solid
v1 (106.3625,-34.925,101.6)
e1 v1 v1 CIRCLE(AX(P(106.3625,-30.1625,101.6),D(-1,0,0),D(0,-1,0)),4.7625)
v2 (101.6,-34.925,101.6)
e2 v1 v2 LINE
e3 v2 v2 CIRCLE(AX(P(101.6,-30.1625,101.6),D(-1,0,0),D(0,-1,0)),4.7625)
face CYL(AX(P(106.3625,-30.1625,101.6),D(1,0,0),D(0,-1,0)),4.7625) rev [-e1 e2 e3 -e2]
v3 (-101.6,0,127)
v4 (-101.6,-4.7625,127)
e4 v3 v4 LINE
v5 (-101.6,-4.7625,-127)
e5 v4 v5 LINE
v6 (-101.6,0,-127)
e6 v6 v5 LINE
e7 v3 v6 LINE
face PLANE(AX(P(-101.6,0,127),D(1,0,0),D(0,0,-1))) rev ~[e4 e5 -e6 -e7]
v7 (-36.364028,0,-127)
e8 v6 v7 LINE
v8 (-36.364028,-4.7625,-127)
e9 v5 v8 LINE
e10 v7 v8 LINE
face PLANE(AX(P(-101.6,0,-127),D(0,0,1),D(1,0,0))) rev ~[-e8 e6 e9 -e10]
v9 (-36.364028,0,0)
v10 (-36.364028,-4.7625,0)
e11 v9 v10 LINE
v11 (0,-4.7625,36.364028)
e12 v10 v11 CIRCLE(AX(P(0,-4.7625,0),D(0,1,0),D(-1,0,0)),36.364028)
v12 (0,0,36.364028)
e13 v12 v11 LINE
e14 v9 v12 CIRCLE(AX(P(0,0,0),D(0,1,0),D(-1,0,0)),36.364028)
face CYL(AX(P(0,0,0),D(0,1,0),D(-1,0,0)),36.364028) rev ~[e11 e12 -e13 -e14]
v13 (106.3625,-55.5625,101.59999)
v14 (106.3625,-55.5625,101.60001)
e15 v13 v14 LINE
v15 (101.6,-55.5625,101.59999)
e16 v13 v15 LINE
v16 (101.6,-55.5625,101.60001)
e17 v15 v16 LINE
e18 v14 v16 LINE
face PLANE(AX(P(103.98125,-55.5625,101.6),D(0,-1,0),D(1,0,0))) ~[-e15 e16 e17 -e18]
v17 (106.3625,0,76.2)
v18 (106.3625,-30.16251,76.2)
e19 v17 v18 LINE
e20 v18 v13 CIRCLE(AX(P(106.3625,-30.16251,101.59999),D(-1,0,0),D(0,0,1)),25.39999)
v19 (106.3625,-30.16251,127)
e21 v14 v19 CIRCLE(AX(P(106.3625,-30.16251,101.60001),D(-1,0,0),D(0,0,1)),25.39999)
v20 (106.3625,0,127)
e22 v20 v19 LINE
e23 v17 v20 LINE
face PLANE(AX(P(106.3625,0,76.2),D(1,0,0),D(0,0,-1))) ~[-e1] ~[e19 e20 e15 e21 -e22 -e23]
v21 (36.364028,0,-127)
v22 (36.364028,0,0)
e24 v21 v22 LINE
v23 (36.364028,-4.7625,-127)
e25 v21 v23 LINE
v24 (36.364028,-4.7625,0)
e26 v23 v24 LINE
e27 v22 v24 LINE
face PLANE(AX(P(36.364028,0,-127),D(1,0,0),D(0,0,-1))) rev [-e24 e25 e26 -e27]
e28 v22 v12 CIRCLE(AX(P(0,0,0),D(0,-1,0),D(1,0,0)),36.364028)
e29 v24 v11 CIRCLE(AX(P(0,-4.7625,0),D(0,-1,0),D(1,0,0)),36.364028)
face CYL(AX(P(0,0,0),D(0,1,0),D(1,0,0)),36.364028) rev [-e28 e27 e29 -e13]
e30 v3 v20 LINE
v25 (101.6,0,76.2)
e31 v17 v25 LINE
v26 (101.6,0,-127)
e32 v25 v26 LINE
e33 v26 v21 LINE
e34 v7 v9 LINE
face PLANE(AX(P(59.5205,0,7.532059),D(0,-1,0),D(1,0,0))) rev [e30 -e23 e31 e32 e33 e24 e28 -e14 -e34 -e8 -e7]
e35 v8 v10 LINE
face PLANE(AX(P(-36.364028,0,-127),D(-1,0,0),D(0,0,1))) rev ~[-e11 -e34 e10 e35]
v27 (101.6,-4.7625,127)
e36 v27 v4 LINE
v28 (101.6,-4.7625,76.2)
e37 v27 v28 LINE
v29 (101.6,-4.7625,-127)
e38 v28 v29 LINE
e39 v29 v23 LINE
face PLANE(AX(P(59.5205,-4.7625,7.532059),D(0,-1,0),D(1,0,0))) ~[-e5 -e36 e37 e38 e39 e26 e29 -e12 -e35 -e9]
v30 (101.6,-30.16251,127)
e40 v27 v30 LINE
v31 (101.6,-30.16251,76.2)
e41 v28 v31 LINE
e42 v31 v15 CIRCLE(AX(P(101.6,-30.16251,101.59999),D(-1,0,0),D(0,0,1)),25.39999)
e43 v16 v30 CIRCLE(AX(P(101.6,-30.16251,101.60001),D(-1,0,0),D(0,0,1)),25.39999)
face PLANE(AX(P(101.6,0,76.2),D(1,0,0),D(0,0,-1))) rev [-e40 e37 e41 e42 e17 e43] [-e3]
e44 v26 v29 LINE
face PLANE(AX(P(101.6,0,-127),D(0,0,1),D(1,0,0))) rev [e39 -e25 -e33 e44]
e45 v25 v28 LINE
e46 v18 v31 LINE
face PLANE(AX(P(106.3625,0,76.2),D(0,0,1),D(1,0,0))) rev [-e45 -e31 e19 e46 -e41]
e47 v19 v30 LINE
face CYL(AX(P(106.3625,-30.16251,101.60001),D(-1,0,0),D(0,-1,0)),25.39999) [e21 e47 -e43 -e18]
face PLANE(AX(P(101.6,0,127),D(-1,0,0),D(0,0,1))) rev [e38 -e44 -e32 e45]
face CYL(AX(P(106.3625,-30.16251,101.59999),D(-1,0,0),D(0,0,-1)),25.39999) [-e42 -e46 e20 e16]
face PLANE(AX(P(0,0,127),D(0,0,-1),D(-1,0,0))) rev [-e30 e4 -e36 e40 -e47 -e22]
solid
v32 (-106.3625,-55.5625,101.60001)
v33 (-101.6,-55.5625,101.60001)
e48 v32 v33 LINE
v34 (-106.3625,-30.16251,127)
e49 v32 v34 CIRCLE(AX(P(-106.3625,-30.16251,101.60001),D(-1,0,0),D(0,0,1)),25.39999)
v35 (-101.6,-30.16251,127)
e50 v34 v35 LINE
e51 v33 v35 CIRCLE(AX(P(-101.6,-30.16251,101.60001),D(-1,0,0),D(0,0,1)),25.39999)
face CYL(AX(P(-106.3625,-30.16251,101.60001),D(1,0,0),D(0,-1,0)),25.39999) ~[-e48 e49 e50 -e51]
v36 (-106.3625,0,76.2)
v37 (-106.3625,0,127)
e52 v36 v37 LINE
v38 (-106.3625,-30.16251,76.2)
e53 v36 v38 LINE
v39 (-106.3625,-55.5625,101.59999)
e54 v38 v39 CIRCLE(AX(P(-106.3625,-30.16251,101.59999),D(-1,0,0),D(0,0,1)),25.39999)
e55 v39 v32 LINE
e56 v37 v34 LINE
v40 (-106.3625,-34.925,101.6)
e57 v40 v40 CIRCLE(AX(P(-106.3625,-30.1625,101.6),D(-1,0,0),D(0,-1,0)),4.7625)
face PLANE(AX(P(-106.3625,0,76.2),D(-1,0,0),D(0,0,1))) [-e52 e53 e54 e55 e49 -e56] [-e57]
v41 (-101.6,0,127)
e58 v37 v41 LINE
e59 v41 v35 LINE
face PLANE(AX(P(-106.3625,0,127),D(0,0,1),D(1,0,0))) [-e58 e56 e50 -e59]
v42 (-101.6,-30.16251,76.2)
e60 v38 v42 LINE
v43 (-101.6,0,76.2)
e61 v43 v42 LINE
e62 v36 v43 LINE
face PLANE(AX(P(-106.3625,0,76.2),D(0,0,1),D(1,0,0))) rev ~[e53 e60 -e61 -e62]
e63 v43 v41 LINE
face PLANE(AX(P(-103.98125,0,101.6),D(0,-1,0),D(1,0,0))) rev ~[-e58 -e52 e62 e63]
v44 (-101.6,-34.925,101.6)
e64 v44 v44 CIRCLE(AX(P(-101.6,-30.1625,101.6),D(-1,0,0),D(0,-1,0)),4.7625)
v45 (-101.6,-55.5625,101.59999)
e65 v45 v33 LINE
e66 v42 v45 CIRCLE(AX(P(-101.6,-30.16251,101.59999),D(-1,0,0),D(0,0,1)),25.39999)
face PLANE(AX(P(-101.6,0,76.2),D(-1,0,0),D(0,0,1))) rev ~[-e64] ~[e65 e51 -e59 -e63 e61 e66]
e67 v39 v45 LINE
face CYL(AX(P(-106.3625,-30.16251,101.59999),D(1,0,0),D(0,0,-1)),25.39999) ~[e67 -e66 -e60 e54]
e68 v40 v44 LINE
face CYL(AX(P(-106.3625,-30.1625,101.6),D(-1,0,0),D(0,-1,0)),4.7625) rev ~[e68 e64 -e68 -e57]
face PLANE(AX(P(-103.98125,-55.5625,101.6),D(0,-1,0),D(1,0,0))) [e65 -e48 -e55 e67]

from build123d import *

# Parameters (mm, degrees)
F1_DEPTH = 4.7625
F2_W     = 4.7625
F2_H     = 50.8
F3_DEPTH = 55.5625
F4_R     = 4.7625
F5_DEPTH = 4.7625
F6_R     = 25.39999


# Not quite as in the source:
# - a fillet or chamfer is up to 0.001 mm smaller than in the source, because OpenCascade refuses the exact size


with BuildPart() as f1:
    # F0 (on Front) → F1 (new body)
    with BuildSketch(Plane.XZ):
        with BuildLine():
            Line((-101.6, 127), (-101.6, -127))
            Line((-101.6, -127), (-36.3640275955, -127))
            Line((-36.3640275955, -127), (-36.3640275955, 0))
            ThreePointArc((-36.3640275955, 0), (-25.713250504, 25.713250504), (0, 36.3640275955))
            Line((0, 36.3640275955), (0, 127))
            Line((0, 127), (-101.6, 127))
        make_face()
    extrude(amount=F1_DEPTH)



with BuildPart() as f3:
    # F2 (on Front) → F3 (new body)
    with BuildSketch(Plane.XZ):
        with Locations((-103.98125, 101.6)):
            Rectangle(F2_W, F2_H)
    extrude(amount=F3_DEPTH)

    # F4 (on face) → F5 (cut, through all)
    with BuildSketch(Plane(origin=(-106.3625, 0, 0), x_dir=(0, -1, 0), z_dir=(-1, 0, 0))):
        with Locations((30.1625, 101.6)):
            Circle(F4_R)
    extrude(amount=-F5_DEPTH, mode=Mode.SUBTRACT)

    # F6 (radius 25.4 in the source; OpenCascade refuses exactly that, so slightly less here)
    f6_edges = [f3.edges().sort_by_distance(p)[0] for p in [
        (-103.98125, -55.5625, 127),
        (-103.98125, -55.5625, 76.2),
    ]]
    fillet(f6_edges, radius=F6_R)


with BuildPart() as f1_1:
    add(f1.part)
    # F7: F3, F1 across plane
    add(f3.part.mirror(Plane.YZ))
    add(f1.part.mirror(Plane.YZ))


solid = Compound([f3.part, f1_1.part])
